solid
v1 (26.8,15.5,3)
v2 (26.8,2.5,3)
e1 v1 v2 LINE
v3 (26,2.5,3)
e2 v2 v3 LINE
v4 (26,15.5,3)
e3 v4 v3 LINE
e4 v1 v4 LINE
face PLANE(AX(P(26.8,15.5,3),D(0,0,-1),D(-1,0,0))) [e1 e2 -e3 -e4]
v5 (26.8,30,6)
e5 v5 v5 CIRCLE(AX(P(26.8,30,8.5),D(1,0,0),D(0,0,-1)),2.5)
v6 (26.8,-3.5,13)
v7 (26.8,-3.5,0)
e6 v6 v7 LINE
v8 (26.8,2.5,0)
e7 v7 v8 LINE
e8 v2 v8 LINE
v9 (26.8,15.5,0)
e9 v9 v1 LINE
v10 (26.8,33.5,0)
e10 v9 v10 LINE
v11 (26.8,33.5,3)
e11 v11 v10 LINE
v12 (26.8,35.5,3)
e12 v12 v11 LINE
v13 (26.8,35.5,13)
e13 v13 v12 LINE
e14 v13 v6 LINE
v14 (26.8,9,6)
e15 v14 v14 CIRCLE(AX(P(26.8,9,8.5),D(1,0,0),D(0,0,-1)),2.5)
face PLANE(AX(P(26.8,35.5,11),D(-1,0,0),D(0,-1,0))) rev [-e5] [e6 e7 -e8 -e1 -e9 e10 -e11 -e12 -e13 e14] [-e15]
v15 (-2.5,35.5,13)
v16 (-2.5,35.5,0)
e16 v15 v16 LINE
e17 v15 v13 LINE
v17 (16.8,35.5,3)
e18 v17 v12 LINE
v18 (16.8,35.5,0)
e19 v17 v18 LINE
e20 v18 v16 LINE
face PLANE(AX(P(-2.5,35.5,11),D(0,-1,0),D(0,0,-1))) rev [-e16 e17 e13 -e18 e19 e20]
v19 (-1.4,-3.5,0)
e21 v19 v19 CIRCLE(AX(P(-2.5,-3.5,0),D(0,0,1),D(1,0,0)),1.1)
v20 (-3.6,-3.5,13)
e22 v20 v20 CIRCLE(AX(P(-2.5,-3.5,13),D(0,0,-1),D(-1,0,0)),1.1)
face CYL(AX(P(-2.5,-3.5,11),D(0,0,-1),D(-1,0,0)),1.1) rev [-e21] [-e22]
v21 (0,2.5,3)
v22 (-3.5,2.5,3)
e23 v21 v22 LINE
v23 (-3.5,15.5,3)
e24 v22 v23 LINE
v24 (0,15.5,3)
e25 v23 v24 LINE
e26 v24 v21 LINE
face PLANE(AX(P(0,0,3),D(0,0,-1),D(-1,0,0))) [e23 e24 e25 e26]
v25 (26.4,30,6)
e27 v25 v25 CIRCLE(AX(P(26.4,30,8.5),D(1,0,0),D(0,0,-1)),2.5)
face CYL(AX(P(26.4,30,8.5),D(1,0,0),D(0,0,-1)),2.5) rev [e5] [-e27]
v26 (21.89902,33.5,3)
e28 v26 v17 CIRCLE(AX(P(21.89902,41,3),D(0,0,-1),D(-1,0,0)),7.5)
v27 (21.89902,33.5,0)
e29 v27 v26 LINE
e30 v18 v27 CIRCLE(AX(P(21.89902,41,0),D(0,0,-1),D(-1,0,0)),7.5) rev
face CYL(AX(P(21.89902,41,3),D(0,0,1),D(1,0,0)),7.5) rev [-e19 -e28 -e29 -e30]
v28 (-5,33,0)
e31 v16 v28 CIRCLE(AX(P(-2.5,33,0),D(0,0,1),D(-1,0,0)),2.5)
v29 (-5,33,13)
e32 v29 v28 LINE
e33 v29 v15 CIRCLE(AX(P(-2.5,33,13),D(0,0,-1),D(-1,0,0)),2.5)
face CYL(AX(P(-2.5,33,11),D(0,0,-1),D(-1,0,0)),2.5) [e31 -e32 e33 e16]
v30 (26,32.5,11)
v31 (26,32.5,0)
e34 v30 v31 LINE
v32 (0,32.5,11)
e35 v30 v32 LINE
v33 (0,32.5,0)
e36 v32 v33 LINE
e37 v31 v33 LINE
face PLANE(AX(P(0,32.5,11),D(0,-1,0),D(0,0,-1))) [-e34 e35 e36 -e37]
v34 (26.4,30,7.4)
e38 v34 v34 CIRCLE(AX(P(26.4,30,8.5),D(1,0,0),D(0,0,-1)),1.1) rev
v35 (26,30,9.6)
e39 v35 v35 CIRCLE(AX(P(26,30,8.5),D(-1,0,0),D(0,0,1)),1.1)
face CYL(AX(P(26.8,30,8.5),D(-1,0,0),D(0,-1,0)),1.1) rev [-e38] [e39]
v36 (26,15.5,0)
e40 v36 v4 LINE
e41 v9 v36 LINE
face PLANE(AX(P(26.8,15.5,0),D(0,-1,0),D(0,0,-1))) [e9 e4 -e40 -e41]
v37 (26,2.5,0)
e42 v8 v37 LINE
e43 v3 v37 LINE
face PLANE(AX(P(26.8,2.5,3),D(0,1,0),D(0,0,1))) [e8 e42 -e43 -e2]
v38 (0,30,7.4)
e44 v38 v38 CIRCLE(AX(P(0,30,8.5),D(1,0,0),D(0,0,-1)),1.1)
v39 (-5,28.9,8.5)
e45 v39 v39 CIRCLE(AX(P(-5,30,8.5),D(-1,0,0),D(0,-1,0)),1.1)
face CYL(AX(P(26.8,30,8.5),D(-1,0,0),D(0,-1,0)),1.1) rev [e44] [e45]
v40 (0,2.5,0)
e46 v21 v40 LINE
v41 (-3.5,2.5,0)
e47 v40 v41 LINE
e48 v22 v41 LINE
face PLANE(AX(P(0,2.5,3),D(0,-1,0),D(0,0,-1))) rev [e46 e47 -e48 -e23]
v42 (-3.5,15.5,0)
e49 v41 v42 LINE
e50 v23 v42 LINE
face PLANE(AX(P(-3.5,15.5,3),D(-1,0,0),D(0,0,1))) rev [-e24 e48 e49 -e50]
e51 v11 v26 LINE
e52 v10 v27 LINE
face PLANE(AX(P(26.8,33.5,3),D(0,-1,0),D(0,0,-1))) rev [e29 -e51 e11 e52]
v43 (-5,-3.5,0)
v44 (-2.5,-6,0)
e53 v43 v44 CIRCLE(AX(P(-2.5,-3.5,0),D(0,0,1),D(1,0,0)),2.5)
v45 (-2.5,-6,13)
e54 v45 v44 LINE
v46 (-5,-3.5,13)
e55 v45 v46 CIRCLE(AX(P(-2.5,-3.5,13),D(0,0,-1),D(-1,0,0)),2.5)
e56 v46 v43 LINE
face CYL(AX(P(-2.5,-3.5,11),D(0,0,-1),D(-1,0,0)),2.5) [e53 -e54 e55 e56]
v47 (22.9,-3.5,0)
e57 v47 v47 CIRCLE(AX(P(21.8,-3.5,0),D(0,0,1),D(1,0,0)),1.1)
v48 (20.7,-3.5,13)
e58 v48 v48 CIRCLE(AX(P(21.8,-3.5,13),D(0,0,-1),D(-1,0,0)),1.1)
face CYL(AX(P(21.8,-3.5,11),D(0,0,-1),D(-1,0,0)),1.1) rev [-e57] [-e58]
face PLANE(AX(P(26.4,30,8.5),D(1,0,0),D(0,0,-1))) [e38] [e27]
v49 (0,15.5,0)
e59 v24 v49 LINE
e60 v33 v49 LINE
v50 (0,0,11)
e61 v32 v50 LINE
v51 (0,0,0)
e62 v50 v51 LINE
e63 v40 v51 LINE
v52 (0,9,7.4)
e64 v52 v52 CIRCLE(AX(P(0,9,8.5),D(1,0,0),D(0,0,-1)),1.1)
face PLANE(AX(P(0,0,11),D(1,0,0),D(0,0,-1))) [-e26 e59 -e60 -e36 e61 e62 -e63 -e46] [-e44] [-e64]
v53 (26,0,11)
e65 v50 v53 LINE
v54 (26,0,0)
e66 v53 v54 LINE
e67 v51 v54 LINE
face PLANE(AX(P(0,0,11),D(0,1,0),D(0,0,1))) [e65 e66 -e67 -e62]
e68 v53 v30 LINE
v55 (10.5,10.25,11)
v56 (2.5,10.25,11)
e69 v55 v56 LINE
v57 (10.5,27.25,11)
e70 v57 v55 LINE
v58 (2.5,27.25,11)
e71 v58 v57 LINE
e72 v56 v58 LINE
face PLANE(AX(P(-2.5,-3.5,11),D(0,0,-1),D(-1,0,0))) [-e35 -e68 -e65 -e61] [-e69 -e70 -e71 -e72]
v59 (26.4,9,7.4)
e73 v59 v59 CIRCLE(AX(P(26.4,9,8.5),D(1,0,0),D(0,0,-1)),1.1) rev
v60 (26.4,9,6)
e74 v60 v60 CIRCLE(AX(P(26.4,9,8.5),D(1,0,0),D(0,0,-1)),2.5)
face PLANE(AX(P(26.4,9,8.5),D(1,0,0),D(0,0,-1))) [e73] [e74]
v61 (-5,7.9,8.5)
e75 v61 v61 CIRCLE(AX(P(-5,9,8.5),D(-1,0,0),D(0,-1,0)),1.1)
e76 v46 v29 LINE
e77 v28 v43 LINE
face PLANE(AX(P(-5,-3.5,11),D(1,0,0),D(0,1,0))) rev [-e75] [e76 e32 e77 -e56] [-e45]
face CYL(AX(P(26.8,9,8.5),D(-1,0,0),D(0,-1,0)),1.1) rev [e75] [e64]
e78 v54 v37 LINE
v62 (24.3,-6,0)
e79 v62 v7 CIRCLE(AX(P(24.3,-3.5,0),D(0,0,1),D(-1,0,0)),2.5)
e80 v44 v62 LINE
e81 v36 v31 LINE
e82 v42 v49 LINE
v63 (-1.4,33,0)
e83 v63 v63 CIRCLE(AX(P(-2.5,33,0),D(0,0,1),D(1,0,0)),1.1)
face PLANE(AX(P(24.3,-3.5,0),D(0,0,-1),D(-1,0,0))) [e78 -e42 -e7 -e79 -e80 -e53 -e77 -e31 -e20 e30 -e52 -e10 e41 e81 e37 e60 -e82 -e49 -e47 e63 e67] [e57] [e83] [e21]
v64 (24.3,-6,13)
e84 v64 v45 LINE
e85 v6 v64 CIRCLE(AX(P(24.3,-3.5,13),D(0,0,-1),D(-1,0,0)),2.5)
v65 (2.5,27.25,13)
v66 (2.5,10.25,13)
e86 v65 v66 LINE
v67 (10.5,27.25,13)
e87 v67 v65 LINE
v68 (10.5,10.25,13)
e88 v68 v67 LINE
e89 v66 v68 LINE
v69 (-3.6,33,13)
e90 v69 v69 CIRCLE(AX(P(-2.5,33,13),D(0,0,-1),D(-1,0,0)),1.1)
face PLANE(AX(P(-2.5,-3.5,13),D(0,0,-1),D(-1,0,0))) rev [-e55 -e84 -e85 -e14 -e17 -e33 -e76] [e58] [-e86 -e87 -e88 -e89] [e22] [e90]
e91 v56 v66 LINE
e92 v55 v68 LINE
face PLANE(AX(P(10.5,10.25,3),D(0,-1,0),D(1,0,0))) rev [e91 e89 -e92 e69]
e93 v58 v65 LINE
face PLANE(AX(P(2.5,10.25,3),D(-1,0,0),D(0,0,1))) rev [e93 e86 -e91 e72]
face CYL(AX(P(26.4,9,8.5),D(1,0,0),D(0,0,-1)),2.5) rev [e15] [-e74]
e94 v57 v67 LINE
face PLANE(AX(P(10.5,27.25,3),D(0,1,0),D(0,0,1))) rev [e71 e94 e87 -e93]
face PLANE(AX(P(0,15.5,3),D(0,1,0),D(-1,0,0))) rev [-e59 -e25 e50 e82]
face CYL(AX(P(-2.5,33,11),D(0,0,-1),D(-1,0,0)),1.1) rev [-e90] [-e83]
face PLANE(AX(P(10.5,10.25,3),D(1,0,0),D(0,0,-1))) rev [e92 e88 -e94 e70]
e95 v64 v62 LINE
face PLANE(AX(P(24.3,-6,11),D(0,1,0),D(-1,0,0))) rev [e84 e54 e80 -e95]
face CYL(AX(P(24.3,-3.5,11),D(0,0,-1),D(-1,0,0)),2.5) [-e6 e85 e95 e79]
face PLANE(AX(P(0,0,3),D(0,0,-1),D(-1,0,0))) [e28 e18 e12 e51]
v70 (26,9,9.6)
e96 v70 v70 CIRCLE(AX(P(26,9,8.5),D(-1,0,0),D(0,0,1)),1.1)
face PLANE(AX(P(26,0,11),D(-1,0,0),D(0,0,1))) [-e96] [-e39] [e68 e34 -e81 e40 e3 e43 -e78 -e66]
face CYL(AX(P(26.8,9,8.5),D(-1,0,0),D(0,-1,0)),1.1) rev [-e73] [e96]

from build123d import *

# Parameters (mm, degrees)
SKETCH_1_R          = 1.1
SKETCH_1_W          = 26
SKETCH_1_H          = 32.5
EXTRUDE_1_DEPTH     = 11
SKETCH_3_R          = 1.1
EXTRUDE_2_DEPTH     = 2
SKETCH_2_R          = 1.1
CUT_EXTRUDE_1_DEPTH = 50.401315772
SKETCH_4_W          = 8
SKETCH_4_H          = 17
CUT_EXTRUDE_3_DEPTH = 10
SKETCH_5_R          = 2.5
CUT_EXTRUDE_4_DEPTH = 0.4
SKETCH_6_W          = 3.5
SKETCH_6_H          = 13
SKETCH_6_W_2        = 10
SKETCH_6_H_2        = 2
CUT_EXTRUDE_6_DEPTH = 3
FILLET_1_R          = 7.5
SKETCH_7_W          = 3
SKETCH_7_H          = 13
CUT_EXTRUDE_7_DEPTH = 49.449355001


with BuildPart() as part:
    # ｽｹｯﾁ1 → ﾎﾞｽ - 押し出し1 (new body)
    with BuildSketch(Plane.XY):
        with BuildLine():
            Line((26.8, 35.5), (26.8, -3.5))
            ThreePointArc((26.8, -3.5), (26.067766953, -5.267766953), (24.3, -6))
            Line((24.3, -6), (-2.5, -6))
            ThreePointArc((-2.5, -6), (-4.267766953, -5.267766953), (-5, -3.5))
            Line((-5, -3.5), (-5, 33))
            ThreePointArc((-5, 33), (-4.267766953, 34.767766953), (-2.5, 35.5))
            Line((-2.5, 35.5), (26.8, 35.5))
        make_face()
        with Locations((-2.5, 33)):
            Circle(SKETCH_1_R, mode=Mode.SUBTRACT)
        with Locations((-2.5, -3.5)):
            Circle(SKETCH_1_R, mode=Mode.SUBTRACT)
        with Locations((21.8, -3.5)):
            Circle(SKETCH_1_R, mode=Mode.SUBTRACT)
        with Locations((13, 16.25)):
            Rectangle(SKETCH_1_W, SKETCH_1_H, mode=Mode.SUBTRACT)
    extrude(amount=EXTRUDE_1_DEPTH)

    # ｽｹｯﾁ3 → ﾎﾞｽ - 押し出し2 (add)
    with BuildSketch(Plane(origin=(0, 0, 11), x_dir=(-1, 0, 0), z_dir=(0, 0, -1))):
        with BuildLine():
            Line((5, -3.5), (5, 33))
            ThreePointArc((5, 33), (4.267766953, 34.767766953), (2.5, 35.5))
            Line((2.5, 35.5), (-26.8, 35.5))
            Line((-26.8, 35.5), (-26.8, -3.5))
            ThreePointArc((-26.8, -3.5), (-26.067766953, -5.267766953), (-24.3, -6))
            Line((-24.3, -6), (2.5, -6))
            ThreePointArc((2.5, -6), (4.267766953, -5.267766953), (5, -3.5))
        make_face()
        with Locations((-21.8, -3.5)):
            Circle(SKETCH_3_R, mode=Mode.SUBTRACT)
        with Locations((2.5, -3.5)):
            Circle(SKETCH_3_R, mode=Mode.SUBTRACT)
        with Locations((2.5, 33)):
            Circle(SKETCH_3_R, mode=Mode.SUBTRACT)
    extrude(amount=-EXTRUDE_2_DEPTH)

    # ｽｹｯﾁ2 → ｶｯﾄ - 押し出し1 (cut, through all)
    with BuildSketch(Plane.ZY.offset(5)):
        with Locations(Location((8.5, 30, 0), (0, 0, 270))):
            Circle(SKETCH_2_R)
        with Locations(Location((8.5, 9, 0), (0, 0, 270))):
            Circle(SKETCH_2_R)
    extrude(amount=-CUT_EXTRUDE_1_DEPTH, mode=Mode.SUBTRACT)

    # ｽｹｯﾁ4 → ｶｯﾄ - 押し出し3 (cut)
    with BuildSketch(Plane.XY.offset(13)):
        with Locations((6.5, 18.75)):
            Rectangle(SKETCH_4_W, SKETCH_4_H)
    extrude(amount=-CUT_EXTRUDE_3_DEPTH, mode=Mode.SUBTRACT)

    # ｽｹｯﾁ5 → ｶｯﾄ - 押し出し4 (cut)
    with BuildSketch(Plane(origin=(26.8, 0, 0), x_dir=(0, 0, -1), z_dir=(1, 0, 0))):
        with Locations((-8.5, 30)):
            Circle(SKETCH_5_R)
        with Locations((-8.5, 9)):
            Circle(SKETCH_5_R)
    extrude(amount=-CUT_EXTRUDE_4_DEPTH, mode=Mode.SUBTRACT)

    # ｽｹｯﾁ6 → ｶｯﾄ - 押し出し6 (cut)
    with BuildSketch(Plane(origin=(0, 0, 0), x_dir=(-1, 0, 0), z_dir=(0, 0, -1))):
        with Locations((1.75, 9)):
            Rectangle(SKETCH_6_W, SKETCH_6_H)
        with Locations((-21.8, 34.5)):
            Rectangle(SKETCH_6_W_2, SKETCH_6_H_2)
    extrude(amount=-CUT_EXTRUDE_6_DEPTH, mode=Mode.SUBTRACT)

    # ﾌｨﾚｯﾄ1
    # the kernel refuses this fillet: 7.5 mm, written as the material it adds along each edge
    with BuildSketch(Plane(origin=(16.8, 33.5, 0), x_dir=(0, 1, 0), z_dir=(0, 0, 1))) as fillet_1_piece_1:
        with BuildLine():
            CenterArc((7.5, -5.099019514), FILLET_1_R, 137.166571934, 42.833428066)
            Line((0, -5.099019514), (0, 0))
            Line((0, 0), (2, 0))
        make_face()
    extrude(amount=3)

    # ｽｹｯﾁ7 → ｶｯﾄ - 押し出し7 (cut, through all)
    with BuildSketch(Plane(origin=(-3.5, 0, 0), x_dir=(0, 0, -1), z_dir=(1, 0, 0))):
        with Locations((-1.5, 9)):
            Rectangle(SKETCH_7_W, SKETCH_7_H)
    extrude(amount=CUT_EXTRUDE_7_DEPTH, mode=Mode.SUBTRACT)


solid = part.part
